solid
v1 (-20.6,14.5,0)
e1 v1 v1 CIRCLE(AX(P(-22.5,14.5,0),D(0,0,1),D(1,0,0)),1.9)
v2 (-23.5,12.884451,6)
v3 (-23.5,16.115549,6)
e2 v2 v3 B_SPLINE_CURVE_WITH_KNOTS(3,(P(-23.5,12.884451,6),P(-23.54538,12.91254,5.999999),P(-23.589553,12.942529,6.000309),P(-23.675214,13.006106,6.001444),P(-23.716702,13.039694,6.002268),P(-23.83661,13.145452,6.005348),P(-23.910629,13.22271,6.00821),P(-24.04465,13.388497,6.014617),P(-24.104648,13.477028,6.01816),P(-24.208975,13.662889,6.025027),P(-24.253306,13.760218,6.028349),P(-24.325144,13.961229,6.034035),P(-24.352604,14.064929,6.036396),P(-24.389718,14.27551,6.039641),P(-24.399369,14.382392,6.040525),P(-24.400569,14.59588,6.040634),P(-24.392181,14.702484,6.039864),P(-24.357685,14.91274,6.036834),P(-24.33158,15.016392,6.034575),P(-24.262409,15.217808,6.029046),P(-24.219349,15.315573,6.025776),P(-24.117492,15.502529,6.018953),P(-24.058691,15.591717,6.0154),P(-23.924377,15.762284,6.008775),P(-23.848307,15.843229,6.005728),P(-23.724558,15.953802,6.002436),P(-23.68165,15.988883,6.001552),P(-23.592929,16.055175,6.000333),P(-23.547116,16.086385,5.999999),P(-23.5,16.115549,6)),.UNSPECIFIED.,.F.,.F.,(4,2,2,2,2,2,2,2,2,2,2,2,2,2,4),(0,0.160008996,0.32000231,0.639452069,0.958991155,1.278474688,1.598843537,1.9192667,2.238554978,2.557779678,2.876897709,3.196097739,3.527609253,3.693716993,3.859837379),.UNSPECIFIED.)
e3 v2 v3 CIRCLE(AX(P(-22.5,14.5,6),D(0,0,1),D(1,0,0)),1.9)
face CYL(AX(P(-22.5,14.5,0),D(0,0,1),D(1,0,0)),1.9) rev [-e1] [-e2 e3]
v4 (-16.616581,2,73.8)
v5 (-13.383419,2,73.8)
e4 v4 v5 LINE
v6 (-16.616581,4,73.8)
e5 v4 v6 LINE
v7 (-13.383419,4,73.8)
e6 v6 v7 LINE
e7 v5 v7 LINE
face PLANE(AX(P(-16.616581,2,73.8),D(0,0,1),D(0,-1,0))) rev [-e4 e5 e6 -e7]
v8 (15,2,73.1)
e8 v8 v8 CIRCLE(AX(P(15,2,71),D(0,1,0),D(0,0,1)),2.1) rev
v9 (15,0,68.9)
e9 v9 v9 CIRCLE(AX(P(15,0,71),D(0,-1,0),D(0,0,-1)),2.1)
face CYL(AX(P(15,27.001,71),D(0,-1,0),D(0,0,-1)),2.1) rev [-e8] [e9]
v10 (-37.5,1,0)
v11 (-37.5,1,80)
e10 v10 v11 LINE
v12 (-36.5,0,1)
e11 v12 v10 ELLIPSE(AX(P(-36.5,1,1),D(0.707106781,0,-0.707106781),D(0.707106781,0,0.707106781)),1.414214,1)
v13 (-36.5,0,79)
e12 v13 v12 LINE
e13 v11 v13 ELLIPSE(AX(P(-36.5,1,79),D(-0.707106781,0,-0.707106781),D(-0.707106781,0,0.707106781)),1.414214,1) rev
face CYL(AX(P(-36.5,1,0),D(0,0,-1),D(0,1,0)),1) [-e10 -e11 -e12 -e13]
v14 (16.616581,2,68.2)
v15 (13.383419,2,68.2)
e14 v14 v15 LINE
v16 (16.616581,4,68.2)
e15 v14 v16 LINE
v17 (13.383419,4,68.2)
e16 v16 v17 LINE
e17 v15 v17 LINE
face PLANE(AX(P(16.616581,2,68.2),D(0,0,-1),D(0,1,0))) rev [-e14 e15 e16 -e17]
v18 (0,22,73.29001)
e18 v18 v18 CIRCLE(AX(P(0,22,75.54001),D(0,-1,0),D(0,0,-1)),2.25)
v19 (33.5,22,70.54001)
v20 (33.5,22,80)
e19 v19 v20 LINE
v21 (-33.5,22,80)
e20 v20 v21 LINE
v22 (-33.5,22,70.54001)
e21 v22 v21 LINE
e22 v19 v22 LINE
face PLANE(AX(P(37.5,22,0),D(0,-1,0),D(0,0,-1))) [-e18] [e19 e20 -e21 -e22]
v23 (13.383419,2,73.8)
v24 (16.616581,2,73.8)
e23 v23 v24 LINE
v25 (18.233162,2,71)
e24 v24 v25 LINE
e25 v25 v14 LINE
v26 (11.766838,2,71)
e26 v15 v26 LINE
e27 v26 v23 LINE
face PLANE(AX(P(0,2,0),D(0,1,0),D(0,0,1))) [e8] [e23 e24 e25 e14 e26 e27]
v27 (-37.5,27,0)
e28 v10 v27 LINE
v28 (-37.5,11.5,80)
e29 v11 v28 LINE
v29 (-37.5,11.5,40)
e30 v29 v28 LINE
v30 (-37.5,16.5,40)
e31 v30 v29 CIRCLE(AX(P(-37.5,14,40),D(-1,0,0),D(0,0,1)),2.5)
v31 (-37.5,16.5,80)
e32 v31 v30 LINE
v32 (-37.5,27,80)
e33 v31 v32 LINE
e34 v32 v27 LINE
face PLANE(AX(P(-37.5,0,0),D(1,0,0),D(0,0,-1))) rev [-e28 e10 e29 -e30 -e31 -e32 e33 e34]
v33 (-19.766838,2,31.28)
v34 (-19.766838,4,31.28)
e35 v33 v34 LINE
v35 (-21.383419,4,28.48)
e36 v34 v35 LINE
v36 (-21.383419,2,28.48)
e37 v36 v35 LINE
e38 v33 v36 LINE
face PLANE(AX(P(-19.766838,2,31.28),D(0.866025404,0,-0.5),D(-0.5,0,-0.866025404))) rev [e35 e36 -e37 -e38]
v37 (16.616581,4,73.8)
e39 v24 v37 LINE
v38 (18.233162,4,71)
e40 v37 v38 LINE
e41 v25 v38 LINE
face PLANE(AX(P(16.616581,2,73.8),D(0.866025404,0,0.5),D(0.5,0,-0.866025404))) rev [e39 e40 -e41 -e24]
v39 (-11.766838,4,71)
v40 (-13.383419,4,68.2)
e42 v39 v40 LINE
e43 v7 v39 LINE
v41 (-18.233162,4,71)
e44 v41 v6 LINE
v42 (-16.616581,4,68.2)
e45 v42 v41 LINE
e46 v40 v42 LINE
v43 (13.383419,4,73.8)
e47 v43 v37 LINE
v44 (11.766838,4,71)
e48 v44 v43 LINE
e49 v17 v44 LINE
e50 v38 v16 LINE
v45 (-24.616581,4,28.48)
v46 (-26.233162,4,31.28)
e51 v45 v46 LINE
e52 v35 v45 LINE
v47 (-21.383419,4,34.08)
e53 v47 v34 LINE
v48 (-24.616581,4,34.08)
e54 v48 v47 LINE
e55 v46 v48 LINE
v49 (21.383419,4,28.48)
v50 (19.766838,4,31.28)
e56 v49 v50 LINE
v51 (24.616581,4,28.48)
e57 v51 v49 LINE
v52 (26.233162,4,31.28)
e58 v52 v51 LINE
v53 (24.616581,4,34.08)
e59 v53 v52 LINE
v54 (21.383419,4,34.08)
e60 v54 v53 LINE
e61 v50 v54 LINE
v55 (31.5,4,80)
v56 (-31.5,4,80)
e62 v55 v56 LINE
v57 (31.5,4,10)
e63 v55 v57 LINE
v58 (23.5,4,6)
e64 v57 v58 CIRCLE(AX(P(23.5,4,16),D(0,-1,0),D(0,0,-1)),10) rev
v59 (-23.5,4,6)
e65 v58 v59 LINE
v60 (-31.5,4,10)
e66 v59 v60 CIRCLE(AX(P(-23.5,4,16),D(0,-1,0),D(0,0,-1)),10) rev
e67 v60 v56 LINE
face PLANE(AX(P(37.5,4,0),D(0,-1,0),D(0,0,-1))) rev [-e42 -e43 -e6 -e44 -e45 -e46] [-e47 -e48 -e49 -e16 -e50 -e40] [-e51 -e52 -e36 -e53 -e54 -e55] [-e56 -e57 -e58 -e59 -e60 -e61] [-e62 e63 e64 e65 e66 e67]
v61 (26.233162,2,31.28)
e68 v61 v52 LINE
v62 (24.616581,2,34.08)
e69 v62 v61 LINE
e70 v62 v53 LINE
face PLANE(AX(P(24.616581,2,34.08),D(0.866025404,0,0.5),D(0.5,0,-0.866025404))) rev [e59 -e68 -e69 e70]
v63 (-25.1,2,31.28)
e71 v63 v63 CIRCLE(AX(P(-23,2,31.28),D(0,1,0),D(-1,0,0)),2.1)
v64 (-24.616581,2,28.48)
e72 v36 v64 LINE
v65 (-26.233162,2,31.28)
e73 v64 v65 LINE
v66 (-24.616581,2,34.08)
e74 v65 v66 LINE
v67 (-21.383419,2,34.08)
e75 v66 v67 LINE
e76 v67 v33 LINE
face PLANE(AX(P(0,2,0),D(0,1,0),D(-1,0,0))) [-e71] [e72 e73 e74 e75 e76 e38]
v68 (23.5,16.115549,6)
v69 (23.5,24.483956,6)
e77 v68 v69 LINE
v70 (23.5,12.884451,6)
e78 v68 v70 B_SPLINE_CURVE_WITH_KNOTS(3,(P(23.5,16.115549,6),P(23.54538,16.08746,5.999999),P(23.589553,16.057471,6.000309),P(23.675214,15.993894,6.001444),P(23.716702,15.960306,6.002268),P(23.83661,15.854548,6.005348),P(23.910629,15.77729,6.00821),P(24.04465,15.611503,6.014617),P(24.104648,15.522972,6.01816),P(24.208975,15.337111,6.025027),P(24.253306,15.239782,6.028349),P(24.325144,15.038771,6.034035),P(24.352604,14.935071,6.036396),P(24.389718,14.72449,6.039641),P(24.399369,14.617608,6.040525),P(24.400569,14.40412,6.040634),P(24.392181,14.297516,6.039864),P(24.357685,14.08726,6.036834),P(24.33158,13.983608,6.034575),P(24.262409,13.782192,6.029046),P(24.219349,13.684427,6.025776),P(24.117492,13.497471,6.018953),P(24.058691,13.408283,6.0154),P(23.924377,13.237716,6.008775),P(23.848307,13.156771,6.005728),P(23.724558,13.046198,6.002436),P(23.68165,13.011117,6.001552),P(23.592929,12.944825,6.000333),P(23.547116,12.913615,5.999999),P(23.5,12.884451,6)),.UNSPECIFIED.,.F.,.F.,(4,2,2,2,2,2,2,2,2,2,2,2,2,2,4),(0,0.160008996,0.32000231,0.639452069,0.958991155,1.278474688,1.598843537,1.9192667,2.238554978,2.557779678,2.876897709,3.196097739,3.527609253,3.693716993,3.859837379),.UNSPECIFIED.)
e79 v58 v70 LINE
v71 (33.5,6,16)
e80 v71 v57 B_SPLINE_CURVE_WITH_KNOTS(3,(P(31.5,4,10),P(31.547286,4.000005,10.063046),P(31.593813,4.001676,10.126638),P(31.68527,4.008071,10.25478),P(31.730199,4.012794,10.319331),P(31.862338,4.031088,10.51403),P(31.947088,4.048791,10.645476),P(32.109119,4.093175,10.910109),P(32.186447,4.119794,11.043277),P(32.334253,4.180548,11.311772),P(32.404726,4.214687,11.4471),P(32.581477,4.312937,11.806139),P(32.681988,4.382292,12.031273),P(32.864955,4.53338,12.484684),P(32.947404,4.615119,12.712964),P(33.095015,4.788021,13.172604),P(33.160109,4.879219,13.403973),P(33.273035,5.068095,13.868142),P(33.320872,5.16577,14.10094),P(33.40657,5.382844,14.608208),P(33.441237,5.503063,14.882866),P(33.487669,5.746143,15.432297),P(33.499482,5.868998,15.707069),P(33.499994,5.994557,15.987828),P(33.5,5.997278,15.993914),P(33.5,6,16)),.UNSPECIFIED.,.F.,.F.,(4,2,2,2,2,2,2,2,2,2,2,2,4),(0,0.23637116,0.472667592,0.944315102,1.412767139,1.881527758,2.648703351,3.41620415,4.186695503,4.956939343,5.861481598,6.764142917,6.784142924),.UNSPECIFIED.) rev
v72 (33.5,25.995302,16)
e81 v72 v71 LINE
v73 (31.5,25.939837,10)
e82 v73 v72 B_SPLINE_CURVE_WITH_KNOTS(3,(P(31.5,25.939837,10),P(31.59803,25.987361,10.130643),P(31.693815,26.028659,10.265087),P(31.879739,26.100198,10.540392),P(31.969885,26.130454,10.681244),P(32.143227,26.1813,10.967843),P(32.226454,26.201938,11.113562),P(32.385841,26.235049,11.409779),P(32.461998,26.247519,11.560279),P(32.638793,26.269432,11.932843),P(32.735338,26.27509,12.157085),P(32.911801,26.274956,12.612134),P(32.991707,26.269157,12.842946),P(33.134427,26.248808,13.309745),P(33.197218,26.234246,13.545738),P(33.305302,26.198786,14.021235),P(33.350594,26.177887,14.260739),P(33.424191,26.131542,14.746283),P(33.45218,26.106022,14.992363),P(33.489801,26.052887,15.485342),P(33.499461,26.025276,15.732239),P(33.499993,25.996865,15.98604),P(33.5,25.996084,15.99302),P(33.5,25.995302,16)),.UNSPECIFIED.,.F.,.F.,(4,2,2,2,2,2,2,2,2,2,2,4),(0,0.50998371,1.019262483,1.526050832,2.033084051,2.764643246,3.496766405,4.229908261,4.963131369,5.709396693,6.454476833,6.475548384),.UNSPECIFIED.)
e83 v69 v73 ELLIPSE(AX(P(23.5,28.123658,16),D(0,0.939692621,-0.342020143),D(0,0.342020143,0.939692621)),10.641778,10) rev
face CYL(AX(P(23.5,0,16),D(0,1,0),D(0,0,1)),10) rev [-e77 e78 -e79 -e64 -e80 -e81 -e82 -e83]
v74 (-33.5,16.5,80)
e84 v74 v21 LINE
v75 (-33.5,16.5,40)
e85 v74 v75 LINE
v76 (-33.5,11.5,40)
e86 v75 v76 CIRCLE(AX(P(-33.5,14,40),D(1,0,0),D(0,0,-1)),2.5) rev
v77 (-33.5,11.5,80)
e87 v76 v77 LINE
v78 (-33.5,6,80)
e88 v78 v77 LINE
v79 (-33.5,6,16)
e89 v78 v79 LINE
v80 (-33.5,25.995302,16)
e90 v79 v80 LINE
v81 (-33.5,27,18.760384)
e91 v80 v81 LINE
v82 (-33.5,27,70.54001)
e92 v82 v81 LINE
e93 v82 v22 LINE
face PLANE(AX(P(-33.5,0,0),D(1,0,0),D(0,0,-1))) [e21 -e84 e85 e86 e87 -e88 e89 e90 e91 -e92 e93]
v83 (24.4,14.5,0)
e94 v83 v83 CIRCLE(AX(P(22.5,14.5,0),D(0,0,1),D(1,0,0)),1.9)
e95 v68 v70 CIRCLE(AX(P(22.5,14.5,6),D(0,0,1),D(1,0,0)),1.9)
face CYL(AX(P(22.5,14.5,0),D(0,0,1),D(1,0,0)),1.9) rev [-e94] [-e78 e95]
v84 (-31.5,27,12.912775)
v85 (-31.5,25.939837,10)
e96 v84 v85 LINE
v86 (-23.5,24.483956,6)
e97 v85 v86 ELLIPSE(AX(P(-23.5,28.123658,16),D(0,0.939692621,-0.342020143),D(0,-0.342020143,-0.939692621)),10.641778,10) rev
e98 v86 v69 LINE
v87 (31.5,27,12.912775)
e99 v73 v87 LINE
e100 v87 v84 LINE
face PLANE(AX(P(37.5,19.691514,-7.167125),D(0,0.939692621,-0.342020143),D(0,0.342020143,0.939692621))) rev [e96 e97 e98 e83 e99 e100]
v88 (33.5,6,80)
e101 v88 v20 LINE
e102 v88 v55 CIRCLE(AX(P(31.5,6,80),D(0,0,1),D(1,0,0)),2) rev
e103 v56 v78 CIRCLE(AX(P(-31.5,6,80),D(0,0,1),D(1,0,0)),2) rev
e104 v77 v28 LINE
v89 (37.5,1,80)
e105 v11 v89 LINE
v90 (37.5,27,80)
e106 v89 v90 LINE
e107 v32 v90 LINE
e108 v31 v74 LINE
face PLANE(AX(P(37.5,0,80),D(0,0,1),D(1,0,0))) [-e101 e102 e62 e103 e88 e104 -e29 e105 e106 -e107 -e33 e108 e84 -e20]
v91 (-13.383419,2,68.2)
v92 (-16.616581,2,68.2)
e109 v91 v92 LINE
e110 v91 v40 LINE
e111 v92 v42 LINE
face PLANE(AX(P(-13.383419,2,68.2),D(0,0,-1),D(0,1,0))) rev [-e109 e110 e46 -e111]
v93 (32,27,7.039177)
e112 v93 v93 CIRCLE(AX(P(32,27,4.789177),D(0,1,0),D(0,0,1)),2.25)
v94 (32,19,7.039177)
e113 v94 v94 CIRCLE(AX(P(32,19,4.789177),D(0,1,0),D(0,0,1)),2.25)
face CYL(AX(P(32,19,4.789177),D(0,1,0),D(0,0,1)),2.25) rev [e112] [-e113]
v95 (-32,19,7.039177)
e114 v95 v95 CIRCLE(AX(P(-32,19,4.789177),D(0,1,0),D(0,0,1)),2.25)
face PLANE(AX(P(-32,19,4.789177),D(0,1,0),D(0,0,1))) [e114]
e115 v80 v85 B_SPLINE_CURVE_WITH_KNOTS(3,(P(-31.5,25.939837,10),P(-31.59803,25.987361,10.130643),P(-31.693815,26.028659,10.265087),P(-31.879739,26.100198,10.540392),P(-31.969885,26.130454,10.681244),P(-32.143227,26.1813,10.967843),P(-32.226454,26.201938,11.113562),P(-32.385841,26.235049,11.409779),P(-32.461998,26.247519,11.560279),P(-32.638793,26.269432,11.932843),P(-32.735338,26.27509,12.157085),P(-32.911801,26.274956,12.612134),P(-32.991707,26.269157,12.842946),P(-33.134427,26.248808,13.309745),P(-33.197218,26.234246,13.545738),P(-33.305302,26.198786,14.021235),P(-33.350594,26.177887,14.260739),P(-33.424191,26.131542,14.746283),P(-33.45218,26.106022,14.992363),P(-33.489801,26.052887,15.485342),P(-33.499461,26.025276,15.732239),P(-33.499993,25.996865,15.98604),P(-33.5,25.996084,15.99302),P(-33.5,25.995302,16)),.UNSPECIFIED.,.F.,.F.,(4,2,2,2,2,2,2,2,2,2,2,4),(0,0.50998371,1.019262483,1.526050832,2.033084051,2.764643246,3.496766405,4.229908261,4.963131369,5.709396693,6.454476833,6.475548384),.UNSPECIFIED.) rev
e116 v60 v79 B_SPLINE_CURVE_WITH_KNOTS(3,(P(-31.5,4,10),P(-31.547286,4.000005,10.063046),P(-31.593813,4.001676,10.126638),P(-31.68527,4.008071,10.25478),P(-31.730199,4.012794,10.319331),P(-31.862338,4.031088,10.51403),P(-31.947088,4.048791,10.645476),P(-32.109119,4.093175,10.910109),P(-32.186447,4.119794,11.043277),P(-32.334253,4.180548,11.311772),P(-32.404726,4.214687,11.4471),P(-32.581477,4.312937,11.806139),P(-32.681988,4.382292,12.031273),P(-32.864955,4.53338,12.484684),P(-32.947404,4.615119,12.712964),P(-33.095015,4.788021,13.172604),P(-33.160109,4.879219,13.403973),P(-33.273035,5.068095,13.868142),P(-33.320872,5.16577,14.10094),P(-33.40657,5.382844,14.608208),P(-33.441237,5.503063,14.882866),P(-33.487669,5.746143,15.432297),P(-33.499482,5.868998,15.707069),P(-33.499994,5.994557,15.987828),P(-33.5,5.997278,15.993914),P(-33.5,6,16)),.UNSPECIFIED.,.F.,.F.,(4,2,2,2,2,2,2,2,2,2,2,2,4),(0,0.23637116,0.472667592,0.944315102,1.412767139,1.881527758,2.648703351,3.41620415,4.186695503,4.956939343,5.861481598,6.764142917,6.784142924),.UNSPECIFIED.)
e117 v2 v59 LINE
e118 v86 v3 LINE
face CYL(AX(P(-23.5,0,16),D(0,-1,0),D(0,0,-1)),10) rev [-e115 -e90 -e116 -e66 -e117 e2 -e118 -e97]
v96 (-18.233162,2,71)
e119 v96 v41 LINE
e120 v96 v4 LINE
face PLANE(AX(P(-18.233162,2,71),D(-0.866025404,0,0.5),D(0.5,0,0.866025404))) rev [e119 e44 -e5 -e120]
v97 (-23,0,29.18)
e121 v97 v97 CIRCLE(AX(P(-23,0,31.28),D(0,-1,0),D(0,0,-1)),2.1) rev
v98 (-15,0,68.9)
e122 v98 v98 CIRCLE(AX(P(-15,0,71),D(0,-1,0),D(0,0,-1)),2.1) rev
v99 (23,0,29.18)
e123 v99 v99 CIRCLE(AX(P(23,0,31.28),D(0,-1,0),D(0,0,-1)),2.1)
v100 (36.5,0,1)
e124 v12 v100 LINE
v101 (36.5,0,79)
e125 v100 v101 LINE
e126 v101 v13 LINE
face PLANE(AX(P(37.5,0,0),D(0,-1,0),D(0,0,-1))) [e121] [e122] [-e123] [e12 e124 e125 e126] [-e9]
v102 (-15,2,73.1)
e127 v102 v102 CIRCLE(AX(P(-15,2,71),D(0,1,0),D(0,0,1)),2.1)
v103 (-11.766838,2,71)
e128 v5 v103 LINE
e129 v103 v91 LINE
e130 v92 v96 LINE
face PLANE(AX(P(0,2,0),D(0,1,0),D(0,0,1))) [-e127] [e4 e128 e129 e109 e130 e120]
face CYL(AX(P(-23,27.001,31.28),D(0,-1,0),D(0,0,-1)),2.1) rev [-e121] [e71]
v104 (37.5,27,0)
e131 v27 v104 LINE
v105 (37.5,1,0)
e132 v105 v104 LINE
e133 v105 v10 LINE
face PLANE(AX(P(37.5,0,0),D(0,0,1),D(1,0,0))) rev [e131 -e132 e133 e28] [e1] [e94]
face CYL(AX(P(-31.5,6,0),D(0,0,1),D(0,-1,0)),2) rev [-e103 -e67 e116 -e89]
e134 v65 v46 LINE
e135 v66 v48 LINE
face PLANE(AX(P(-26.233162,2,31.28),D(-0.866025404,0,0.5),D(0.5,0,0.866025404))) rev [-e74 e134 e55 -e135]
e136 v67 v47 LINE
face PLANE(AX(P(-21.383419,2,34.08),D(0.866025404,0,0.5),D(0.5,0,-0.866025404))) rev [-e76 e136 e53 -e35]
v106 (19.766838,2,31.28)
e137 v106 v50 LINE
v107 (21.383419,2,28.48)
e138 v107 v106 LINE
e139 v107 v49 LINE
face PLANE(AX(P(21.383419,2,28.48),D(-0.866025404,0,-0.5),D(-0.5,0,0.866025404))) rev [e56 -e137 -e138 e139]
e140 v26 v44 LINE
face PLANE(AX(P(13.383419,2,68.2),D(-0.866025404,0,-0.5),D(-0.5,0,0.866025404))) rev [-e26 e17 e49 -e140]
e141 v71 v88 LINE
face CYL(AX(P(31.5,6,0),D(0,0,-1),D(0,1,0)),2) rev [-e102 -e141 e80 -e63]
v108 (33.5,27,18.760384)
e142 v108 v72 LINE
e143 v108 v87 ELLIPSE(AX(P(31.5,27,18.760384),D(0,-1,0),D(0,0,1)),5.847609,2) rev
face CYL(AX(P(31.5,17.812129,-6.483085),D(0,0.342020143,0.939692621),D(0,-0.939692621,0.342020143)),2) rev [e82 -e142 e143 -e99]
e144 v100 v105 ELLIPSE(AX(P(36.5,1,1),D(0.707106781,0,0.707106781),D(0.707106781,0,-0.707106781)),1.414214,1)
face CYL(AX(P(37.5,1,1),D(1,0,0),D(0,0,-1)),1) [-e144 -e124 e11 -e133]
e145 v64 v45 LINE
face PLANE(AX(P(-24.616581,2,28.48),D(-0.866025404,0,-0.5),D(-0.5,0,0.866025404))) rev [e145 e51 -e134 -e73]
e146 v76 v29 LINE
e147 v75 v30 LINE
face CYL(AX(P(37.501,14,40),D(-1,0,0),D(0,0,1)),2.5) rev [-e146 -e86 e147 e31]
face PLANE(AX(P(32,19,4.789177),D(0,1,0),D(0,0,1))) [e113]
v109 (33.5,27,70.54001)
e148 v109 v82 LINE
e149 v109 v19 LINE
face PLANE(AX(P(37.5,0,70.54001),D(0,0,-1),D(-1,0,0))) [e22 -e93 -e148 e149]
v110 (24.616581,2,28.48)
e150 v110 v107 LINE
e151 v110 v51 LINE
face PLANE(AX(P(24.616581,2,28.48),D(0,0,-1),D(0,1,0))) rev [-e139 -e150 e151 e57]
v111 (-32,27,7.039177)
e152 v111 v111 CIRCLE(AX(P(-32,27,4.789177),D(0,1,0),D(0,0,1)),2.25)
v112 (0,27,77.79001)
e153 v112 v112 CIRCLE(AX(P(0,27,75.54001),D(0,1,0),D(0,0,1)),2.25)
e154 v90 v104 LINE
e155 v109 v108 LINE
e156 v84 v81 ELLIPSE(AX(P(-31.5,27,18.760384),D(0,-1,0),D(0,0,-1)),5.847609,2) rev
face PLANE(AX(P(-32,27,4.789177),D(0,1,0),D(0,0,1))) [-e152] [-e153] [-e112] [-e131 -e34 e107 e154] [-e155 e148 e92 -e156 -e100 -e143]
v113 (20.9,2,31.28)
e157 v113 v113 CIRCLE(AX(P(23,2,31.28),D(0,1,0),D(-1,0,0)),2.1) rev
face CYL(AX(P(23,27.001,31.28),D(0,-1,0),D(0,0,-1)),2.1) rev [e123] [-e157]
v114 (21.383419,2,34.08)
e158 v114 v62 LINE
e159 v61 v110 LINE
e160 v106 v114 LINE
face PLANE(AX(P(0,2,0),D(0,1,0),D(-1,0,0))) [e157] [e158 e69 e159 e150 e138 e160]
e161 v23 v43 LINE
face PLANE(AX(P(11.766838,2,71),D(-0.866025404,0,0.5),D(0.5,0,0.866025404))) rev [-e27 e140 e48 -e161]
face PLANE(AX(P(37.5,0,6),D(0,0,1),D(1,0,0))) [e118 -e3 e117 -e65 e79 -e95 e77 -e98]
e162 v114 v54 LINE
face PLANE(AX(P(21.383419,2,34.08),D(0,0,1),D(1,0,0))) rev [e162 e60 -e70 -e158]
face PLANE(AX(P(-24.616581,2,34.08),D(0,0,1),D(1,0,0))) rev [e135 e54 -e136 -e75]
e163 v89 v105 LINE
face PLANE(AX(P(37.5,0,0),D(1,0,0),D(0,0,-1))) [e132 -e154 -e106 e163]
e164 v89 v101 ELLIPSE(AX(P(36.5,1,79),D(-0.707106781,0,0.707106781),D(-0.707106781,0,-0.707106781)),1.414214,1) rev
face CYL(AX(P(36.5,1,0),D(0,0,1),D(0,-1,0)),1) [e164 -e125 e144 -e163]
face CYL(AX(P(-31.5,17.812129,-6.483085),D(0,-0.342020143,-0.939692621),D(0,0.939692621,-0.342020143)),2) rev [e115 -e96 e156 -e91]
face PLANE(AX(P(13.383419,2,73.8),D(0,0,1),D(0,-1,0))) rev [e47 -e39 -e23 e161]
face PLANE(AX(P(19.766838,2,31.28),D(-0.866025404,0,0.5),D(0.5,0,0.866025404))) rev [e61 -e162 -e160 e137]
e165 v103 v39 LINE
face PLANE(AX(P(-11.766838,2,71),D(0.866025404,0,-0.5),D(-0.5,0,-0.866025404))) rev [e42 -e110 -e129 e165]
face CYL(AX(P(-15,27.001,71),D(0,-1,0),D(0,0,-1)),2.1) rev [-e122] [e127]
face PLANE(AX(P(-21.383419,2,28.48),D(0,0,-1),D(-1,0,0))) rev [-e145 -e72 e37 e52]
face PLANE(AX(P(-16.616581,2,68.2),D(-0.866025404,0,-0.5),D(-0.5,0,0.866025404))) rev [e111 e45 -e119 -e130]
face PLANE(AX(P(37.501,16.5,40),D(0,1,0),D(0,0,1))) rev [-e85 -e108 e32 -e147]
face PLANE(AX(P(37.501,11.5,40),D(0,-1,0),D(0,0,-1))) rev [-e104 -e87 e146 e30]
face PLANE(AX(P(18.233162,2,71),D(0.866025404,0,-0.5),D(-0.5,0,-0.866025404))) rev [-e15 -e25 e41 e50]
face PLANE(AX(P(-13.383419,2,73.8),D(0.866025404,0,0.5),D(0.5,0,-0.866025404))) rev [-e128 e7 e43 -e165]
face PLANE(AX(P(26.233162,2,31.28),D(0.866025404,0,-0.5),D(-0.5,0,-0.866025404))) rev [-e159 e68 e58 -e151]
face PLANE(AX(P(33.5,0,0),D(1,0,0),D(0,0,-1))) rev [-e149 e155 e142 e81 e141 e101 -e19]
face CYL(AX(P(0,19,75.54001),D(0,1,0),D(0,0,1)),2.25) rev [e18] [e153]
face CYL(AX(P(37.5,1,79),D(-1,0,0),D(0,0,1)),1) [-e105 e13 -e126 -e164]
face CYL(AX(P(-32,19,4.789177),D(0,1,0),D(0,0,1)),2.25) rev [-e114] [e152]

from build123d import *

# Parameters (mm, degrees)
EXTRUDE_1_DEPTH          = 37.5
SHELL_START              = -33.5
SHELL_1_DEPTH            = 67
FILLET_1_R               = 5
FILLET_3_R               = 2
FILLET_4_R               = 1
FILLET_5_R               = 10
CUT_EXTRUDE_2_DEPTH      = 94.307288118
CUT_EXTRUDE_2_DEPTH_BACK = 3
SKETCH_3_R               = 1.9
CUT_EXTRUDE_1_DEPTH      = 103.419810279
CUT_EXTRUDE_1_DEPTH_BACK = 103.419810279
SKETCH_2_W               = 80
SKETCH_2_H               = 35
SKETCH_5_R               = 2.25
CUT_EXTRUDE_4_DEPTH      = 8
CUT_EXTRUDE_5_DEPTH      = 88.242478302
CUT_EXTRUDE_5_DEPTH_BACK = 88.242478302
SKETCH_6_R               = 1.9
CUT_EXTRUDE_6_REACH      = 114.934
CUT_EXTRUDE_7_REACH      = 94.386
SKETCH_8_R               = 2.1
CUT_EXTRUDE_8_DEPTH      = 2


# Read off the part's stored shape, not the designer's step: 抽壳1
with BuildPart() as part:
    # 草图1 → 凸台-拉伸1 (new, symmetric)
    with BuildSketch(Plane(origin=(0, 0, 0), x_dir=(0, 0, -1), z_dir=(1, 0, 0))):
        Polygon((-70.540010176, 52.231309316), (-70.540010176, 30), (-80, 30), (-80, 0), (0, 0), (0, 30), (-9.459989824, 30), align=None)
    extrude(amount=EXTRUDE_1_DEPTH, both=True)

    # 抽壳1 outline → 抽壳1 (cut)
    with BuildSketch(Plane.YZ.offset(SHELL_START)):
        Polygon((47.974598226, 70.540010176), (22, 70.540010176), (22, 80), (4, 80), (4, 6), (24.483955603, 6), align=None)
    extrude(amount=SHELL_1_DEPTH, mode=Mode.SUBTRACT)

    # 圆角1
    fillet_1_edges = [part.edges().sort_by_distance(p)[0] for p in [
        (0, 30, 9.459989824),
        (35.5, 30, 70.540010176),
        (-35.5, 30, 70.540010176),
    ]]
    fillet(fillet_1_edges, radius=FILLET_1_R)

    # 圆角3
    fillet_3_edges = [part.edges().sort_by_distance(p)[0] for p in [
        (33.5, 4, 43),
        (33.5, 36.229276914, 38.270005088),
        (-33.5, 36.229276914, 38.270005088),
        (-33.5, 4, 43),
    ]]
    fillet(fillet_3_edges, radius=FILLET_3_R)

    # 圆角4
    fillet_4_edges = [part.edges().sort_by_distance(p)[0] for p in [
        (-37.5, 30, 4.28917746),
        (-37.5, 30.075961235, 9.446595809),
        (37.5, 30, 4.28917746),
        (37.5, 30.075961235, 9.446595809),
        (-37.5, 41.266423106, 40.414232907),
        (0, 52.231309316, 70.540010176),
        (37.5, 41.266423106, 40.414232907),
        (37.5, 0, 40),
        (-37.5, 0, 40),
        (0, 0, 80),
        (0, 0, 0),
        (0, 30, 0),
        (0, 30, 80),
    ]]
    fillet(fillet_4_edges, radius=FILLET_4_R)

    # 圆角5
    # the kernel refuses this fillet: 10 mm, written as the material it adds along each edge
    with BuildSketch(Plane(origin=(33.5, -19, 6), x_dir=(0, 0, 1), z_dir=(0, 1, 0))) as fillet_5_piece_1_section:
        with BuildLine():
            CenterArc((FILLET_5_R, -FILLET_5_R), FILLET_5_R, 90, 90)
            Line((0, -FILLET_5_R), (0, 0))
            Line((0, 0), (FILLET_5_R, 0))
        make_face()
    fillet_5_piece_1 = extrude(amount=66.355600058, mode=Mode.PRIVATE)
    fillet_5_piece_1 = split(fillet_5_piece_1, bisect_by=Plane(origin=(31.283756862, 30, 8.259643185), z_dir=(0, -1, 0)), keep=Keep.TOP, mode=Mode.PRIVATE)
    fillet_5_piece_1 = split(fillet_5_piece_1, bisect_by=Plane(origin=(31.283756862, 0, 8.259643185), z_dir=(0, 1, 0)), keep=Keep.TOP, mode=Mode.PRIVATE)
    add(fillet_5_piece_1)
    with BuildSketch(Plane(origin=(-33.5, -19, 6), x_dir=(0, 0, 1), z_dir=(0, 1, 0))) as fillet_5_piece_2_section:
        with BuildLine():
            CenterArc((FILLET_5_R, FILLET_5_R), FILLET_5_R, 180, 90)
            Line((0, FILLET_5_R), (0, 0))
            Line((0, 0), (FILLET_5_R, 0))
        make_face()
    fillet_5_piece_2 = extrude(amount=66.355600058, mode=Mode.PRIVATE)
    fillet_5_piece_2 = split(fillet_5_piece_2, bisect_by=Plane(origin=(-31.283756862, 30, 8.259643185), z_dir=(0, -1, 0)), keep=Keep.TOP, mode=Mode.PRIVATE)
    fillet_5_piece_2 = split(fillet_5_piece_2, bisect_by=Plane(origin=(-31.283756862, 0, 8.259643185), z_dir=(0, 1, 0)), keep=Keep.TOP, mode=Mode.PRIVATE)
    add(fillet_5_piece_2)

    # 草图3 → 切除-拉伸2 (cut, two sides: drawn at the far end of the back side and taken through both)
    with BuildSketch(Plane(origin=(0, 30, 0), x_dir=(1, 0, 0), z_dir=(0, 1, 0)).offset(-CUT_EXTRUDE_2_DEPTH_BACK)):
        with Locations(Location((-32, -4.78917746, 0), (0, 0, 90))):
            Circle(SKETCH_3_R)
        with Locations(Location((32, -4.78917746, 0), (0, 0, 90))):
            Circle(SKETCH_3_R)
        with Locations(Location((0, -75.540010176, 0), (0, 0, 90))):
            Circle(SKETCH_3_R)
    extrude(amount=CUT_EXTRUDE_2_DEPTH + CUT_EXTRUDE_2_DEPTH_BACK, mode=Mode.SUBTRACT)

    # 草图2 → 切除-拉伸1 (cut, two sides: drawn at the far end of the back side and taken through both)
    with BuildSketch(Plane(origin=(0, 0, 0), x_dir=(0, 0, -1), z_dir=(1, 0, 0)).offset(-CUT_EXTRUDE_1_DEPTH_BACK)):
        with Locations((-40, 44.5)):
            Rectangle(SKETCH_2_W, SKETCH_2_H)
    extrude(amount=CUT_EXTRUDE_1_DEPTH + CUT_EXTRUDE_1_DEPTH_BACK, mode=Mode.SUBTRACT)

    # 草图5 → 切除-拉伸4 (cut)
    with BuildSketch(Plane(origin=(0, 27, 0), x_dir=(1, 0, 0), z_dir=(0, 1, 0))):
        with Locations(Location((0, -75.540010176, 0), (0, 0, 270))):
            Circle(SKETCH_5_R)
        with Locations(Location((32, -4.78917746, 0), (0, 0, 270))):
            Circle(SKETCH_5_R)
        with Locations(Location((-32, -4.78917746, 0), (0, 0, 270))):
            Circle(SKETCH_5_R)
    extrude(amount=-CUT_EXTRUDE_4_DEPTH, mode=Mode.SUBTRACT)

    # 草图6 → 切除-拉伸5 (cut, two sides: drawn at the far end of the back side and taken through both)
    with BuildSketch(Plane.XY.offset(6).offset(-CUT_EXTRUDE_5_DEPTH_BACK)):
        with Locations((-22.5, 14.5)):
            Circle(SKETCH_6_R)
        with Locations((22.5, 14.5)):
            Circle(SKETCH_6_R)
    extrude(amount=CUT_EXTRUDE_5_DEPTH + CUT_EXTRUDE_5_DEPTH_BACK, mode=Mode.SUBTRACT)

    # 草图7 → 切除-拉伸6 (cut, up to next)
    with BuildSketch(Plane.ZY.offset(37.5), mode=Mode.PRIVATE) as cut_extrude_6_sk1:
        with BuildLine():
            Line((40, 16.5), (80, 16.5))
            ThreePointArc((80, 16.5), (82.5, 14), (80, 11.5))
            Line((80, 11.5), (40, 11.5))
            ThreePointArc((40, 11.5), (37.5, 14), (40, 16.5))
        make_face()
    cut_extrude_6_tool1 = extrude(cut_extrude_6_sk1.sketch, amount=-CUT_EXTRUDE_6_REACH, mode=Mode.PRIVATE) & part.part
    add(cut_extrude_6_tool1.solids().sort_by_distance((-37.5, 14, 60))[0], mode=Mode.SUBTRACT)

    # 草图8 → 切除-拉伸7 (cut, up to next)
    with BuildSketch(Plane.XZ, mode=Mode.PRIVATE) as cut_extrude_7_sk1:
        with Locations(Location((23, 31.28, 0), (0, 0, 270))):
            Circle(SKETCH_8_R)
    cut_extrude_7_tool1 = extrude(cut_extrude_7_sk1.sketch, amount=-CUT_EXTRUDE_7_REACH, mode=Mode.PRIVATE) & part.part
    # 草图8 → 切除-拉伸7 (cut, up to next)
    with BuildSketch(Plane.XZ, mode=Mode.PRIVATE) as cut_extrude_7_sk2:
        with Locations(Location((15, 71, 0), (0, 0, 270))):
            Circle(SKETCH_8_R)
    cut_extrude_7_tool2 = extrude(cut_extrude_7_sk2.sketch, amount=-CUT_EXTRUDE_7_REACH, mode=Mode.PRIVATE) & part.part
    # 草图8 → 切除-拉伸7 (cut, up to next)
    with BuildSketch(Plane.XZ, mode=Mode.PRIVATE) as cut_extrude_7_sk3:
        with Locations(Location((-15, 71, 0), (0, 0, 270))):
            Circle(SKETCH_8_R)
    cut_extrude_7_tool3 = extrude(cut_extrude_7_sk3.sketch, amount=-CUT_EXTRUDE_7_REACH, mode=Mode.PRIVATE) & part.part
    # 草图8 → 切除-拉伸7 (cut, up to next)
    with BuildSketch(Plane.XZ, mode=Mode.PRIVATE) as cut_extrude_7_sk4:
        with Locations(Location((-23, 31.28, 0), (0, 0, 270))):
            Circle(SKETCH_8_R)
    cut_extrude_7_tool4 = extrude(cut_extrude_7_sk4.sketch, amount=-CUT_EXTRUDE_7_REACH, mode=Mode.PRIVATE) & part.part
    add(cut_extrude_7_tool1.solids().sort_by_distance((23, 0, 31.28))[0], mode=Mode.SUBTRACT)
    add(cut_extrude_7_tool2.solids().sort_by_distance((15, 0, 71))[0], mode=Mode.SUBTRACT)
    add(cut_extrude_7_tool3.solids().sort_by_distance((-15, 0, 71))[0], mode=Mode.SUBTRACT)
    add(cut_extrude_7_tool4.solids().sort_by_distance((-23, 0, 31.28))[0], mode=Mode.SUBTRACT)

    # 草图9 → 切除-拉伸8 (cut)
    with BuildSketch(Plane(origin=(0, 4, 0), x_dir=(1, 0, 0), z_dir=(0, 1, 0))):
        Polygon((18.233161507, -71), (16.616580754, -68.2), (13.383419246, -68.2), (11.766838493, -71), (13.383419246, -73.8), (16.616580754, -73.8), align=None)
        Polygon((-11.766838493, -71), (-13.383419246, -68.2), (-16.616580754, -68.2), (-18.233161507, -71), (-16.616580754, -73.8), (-13.383419246, -73.8), align=None)
        Polygon((26.233161507, -31.28), (24.616580754, -28.48), (21.383419246, -28.48), (19.766838493, -31.28), (21.383419246, -34.08), (24.616580754, -34.08), align=None)
        Polygon((-26.233161507, -31.28), (-24.616580754, -34.08), (-21.383419246, -34.08), (-19.766838493, -31.28), (-21.383419246, -28.48), (-24.616580754, -28.48), align=None)
    extrude(amount=-CUT_EXTRUDE_8_DEPTH, mode=Mode.SUBTRACT)


solid = part.part
